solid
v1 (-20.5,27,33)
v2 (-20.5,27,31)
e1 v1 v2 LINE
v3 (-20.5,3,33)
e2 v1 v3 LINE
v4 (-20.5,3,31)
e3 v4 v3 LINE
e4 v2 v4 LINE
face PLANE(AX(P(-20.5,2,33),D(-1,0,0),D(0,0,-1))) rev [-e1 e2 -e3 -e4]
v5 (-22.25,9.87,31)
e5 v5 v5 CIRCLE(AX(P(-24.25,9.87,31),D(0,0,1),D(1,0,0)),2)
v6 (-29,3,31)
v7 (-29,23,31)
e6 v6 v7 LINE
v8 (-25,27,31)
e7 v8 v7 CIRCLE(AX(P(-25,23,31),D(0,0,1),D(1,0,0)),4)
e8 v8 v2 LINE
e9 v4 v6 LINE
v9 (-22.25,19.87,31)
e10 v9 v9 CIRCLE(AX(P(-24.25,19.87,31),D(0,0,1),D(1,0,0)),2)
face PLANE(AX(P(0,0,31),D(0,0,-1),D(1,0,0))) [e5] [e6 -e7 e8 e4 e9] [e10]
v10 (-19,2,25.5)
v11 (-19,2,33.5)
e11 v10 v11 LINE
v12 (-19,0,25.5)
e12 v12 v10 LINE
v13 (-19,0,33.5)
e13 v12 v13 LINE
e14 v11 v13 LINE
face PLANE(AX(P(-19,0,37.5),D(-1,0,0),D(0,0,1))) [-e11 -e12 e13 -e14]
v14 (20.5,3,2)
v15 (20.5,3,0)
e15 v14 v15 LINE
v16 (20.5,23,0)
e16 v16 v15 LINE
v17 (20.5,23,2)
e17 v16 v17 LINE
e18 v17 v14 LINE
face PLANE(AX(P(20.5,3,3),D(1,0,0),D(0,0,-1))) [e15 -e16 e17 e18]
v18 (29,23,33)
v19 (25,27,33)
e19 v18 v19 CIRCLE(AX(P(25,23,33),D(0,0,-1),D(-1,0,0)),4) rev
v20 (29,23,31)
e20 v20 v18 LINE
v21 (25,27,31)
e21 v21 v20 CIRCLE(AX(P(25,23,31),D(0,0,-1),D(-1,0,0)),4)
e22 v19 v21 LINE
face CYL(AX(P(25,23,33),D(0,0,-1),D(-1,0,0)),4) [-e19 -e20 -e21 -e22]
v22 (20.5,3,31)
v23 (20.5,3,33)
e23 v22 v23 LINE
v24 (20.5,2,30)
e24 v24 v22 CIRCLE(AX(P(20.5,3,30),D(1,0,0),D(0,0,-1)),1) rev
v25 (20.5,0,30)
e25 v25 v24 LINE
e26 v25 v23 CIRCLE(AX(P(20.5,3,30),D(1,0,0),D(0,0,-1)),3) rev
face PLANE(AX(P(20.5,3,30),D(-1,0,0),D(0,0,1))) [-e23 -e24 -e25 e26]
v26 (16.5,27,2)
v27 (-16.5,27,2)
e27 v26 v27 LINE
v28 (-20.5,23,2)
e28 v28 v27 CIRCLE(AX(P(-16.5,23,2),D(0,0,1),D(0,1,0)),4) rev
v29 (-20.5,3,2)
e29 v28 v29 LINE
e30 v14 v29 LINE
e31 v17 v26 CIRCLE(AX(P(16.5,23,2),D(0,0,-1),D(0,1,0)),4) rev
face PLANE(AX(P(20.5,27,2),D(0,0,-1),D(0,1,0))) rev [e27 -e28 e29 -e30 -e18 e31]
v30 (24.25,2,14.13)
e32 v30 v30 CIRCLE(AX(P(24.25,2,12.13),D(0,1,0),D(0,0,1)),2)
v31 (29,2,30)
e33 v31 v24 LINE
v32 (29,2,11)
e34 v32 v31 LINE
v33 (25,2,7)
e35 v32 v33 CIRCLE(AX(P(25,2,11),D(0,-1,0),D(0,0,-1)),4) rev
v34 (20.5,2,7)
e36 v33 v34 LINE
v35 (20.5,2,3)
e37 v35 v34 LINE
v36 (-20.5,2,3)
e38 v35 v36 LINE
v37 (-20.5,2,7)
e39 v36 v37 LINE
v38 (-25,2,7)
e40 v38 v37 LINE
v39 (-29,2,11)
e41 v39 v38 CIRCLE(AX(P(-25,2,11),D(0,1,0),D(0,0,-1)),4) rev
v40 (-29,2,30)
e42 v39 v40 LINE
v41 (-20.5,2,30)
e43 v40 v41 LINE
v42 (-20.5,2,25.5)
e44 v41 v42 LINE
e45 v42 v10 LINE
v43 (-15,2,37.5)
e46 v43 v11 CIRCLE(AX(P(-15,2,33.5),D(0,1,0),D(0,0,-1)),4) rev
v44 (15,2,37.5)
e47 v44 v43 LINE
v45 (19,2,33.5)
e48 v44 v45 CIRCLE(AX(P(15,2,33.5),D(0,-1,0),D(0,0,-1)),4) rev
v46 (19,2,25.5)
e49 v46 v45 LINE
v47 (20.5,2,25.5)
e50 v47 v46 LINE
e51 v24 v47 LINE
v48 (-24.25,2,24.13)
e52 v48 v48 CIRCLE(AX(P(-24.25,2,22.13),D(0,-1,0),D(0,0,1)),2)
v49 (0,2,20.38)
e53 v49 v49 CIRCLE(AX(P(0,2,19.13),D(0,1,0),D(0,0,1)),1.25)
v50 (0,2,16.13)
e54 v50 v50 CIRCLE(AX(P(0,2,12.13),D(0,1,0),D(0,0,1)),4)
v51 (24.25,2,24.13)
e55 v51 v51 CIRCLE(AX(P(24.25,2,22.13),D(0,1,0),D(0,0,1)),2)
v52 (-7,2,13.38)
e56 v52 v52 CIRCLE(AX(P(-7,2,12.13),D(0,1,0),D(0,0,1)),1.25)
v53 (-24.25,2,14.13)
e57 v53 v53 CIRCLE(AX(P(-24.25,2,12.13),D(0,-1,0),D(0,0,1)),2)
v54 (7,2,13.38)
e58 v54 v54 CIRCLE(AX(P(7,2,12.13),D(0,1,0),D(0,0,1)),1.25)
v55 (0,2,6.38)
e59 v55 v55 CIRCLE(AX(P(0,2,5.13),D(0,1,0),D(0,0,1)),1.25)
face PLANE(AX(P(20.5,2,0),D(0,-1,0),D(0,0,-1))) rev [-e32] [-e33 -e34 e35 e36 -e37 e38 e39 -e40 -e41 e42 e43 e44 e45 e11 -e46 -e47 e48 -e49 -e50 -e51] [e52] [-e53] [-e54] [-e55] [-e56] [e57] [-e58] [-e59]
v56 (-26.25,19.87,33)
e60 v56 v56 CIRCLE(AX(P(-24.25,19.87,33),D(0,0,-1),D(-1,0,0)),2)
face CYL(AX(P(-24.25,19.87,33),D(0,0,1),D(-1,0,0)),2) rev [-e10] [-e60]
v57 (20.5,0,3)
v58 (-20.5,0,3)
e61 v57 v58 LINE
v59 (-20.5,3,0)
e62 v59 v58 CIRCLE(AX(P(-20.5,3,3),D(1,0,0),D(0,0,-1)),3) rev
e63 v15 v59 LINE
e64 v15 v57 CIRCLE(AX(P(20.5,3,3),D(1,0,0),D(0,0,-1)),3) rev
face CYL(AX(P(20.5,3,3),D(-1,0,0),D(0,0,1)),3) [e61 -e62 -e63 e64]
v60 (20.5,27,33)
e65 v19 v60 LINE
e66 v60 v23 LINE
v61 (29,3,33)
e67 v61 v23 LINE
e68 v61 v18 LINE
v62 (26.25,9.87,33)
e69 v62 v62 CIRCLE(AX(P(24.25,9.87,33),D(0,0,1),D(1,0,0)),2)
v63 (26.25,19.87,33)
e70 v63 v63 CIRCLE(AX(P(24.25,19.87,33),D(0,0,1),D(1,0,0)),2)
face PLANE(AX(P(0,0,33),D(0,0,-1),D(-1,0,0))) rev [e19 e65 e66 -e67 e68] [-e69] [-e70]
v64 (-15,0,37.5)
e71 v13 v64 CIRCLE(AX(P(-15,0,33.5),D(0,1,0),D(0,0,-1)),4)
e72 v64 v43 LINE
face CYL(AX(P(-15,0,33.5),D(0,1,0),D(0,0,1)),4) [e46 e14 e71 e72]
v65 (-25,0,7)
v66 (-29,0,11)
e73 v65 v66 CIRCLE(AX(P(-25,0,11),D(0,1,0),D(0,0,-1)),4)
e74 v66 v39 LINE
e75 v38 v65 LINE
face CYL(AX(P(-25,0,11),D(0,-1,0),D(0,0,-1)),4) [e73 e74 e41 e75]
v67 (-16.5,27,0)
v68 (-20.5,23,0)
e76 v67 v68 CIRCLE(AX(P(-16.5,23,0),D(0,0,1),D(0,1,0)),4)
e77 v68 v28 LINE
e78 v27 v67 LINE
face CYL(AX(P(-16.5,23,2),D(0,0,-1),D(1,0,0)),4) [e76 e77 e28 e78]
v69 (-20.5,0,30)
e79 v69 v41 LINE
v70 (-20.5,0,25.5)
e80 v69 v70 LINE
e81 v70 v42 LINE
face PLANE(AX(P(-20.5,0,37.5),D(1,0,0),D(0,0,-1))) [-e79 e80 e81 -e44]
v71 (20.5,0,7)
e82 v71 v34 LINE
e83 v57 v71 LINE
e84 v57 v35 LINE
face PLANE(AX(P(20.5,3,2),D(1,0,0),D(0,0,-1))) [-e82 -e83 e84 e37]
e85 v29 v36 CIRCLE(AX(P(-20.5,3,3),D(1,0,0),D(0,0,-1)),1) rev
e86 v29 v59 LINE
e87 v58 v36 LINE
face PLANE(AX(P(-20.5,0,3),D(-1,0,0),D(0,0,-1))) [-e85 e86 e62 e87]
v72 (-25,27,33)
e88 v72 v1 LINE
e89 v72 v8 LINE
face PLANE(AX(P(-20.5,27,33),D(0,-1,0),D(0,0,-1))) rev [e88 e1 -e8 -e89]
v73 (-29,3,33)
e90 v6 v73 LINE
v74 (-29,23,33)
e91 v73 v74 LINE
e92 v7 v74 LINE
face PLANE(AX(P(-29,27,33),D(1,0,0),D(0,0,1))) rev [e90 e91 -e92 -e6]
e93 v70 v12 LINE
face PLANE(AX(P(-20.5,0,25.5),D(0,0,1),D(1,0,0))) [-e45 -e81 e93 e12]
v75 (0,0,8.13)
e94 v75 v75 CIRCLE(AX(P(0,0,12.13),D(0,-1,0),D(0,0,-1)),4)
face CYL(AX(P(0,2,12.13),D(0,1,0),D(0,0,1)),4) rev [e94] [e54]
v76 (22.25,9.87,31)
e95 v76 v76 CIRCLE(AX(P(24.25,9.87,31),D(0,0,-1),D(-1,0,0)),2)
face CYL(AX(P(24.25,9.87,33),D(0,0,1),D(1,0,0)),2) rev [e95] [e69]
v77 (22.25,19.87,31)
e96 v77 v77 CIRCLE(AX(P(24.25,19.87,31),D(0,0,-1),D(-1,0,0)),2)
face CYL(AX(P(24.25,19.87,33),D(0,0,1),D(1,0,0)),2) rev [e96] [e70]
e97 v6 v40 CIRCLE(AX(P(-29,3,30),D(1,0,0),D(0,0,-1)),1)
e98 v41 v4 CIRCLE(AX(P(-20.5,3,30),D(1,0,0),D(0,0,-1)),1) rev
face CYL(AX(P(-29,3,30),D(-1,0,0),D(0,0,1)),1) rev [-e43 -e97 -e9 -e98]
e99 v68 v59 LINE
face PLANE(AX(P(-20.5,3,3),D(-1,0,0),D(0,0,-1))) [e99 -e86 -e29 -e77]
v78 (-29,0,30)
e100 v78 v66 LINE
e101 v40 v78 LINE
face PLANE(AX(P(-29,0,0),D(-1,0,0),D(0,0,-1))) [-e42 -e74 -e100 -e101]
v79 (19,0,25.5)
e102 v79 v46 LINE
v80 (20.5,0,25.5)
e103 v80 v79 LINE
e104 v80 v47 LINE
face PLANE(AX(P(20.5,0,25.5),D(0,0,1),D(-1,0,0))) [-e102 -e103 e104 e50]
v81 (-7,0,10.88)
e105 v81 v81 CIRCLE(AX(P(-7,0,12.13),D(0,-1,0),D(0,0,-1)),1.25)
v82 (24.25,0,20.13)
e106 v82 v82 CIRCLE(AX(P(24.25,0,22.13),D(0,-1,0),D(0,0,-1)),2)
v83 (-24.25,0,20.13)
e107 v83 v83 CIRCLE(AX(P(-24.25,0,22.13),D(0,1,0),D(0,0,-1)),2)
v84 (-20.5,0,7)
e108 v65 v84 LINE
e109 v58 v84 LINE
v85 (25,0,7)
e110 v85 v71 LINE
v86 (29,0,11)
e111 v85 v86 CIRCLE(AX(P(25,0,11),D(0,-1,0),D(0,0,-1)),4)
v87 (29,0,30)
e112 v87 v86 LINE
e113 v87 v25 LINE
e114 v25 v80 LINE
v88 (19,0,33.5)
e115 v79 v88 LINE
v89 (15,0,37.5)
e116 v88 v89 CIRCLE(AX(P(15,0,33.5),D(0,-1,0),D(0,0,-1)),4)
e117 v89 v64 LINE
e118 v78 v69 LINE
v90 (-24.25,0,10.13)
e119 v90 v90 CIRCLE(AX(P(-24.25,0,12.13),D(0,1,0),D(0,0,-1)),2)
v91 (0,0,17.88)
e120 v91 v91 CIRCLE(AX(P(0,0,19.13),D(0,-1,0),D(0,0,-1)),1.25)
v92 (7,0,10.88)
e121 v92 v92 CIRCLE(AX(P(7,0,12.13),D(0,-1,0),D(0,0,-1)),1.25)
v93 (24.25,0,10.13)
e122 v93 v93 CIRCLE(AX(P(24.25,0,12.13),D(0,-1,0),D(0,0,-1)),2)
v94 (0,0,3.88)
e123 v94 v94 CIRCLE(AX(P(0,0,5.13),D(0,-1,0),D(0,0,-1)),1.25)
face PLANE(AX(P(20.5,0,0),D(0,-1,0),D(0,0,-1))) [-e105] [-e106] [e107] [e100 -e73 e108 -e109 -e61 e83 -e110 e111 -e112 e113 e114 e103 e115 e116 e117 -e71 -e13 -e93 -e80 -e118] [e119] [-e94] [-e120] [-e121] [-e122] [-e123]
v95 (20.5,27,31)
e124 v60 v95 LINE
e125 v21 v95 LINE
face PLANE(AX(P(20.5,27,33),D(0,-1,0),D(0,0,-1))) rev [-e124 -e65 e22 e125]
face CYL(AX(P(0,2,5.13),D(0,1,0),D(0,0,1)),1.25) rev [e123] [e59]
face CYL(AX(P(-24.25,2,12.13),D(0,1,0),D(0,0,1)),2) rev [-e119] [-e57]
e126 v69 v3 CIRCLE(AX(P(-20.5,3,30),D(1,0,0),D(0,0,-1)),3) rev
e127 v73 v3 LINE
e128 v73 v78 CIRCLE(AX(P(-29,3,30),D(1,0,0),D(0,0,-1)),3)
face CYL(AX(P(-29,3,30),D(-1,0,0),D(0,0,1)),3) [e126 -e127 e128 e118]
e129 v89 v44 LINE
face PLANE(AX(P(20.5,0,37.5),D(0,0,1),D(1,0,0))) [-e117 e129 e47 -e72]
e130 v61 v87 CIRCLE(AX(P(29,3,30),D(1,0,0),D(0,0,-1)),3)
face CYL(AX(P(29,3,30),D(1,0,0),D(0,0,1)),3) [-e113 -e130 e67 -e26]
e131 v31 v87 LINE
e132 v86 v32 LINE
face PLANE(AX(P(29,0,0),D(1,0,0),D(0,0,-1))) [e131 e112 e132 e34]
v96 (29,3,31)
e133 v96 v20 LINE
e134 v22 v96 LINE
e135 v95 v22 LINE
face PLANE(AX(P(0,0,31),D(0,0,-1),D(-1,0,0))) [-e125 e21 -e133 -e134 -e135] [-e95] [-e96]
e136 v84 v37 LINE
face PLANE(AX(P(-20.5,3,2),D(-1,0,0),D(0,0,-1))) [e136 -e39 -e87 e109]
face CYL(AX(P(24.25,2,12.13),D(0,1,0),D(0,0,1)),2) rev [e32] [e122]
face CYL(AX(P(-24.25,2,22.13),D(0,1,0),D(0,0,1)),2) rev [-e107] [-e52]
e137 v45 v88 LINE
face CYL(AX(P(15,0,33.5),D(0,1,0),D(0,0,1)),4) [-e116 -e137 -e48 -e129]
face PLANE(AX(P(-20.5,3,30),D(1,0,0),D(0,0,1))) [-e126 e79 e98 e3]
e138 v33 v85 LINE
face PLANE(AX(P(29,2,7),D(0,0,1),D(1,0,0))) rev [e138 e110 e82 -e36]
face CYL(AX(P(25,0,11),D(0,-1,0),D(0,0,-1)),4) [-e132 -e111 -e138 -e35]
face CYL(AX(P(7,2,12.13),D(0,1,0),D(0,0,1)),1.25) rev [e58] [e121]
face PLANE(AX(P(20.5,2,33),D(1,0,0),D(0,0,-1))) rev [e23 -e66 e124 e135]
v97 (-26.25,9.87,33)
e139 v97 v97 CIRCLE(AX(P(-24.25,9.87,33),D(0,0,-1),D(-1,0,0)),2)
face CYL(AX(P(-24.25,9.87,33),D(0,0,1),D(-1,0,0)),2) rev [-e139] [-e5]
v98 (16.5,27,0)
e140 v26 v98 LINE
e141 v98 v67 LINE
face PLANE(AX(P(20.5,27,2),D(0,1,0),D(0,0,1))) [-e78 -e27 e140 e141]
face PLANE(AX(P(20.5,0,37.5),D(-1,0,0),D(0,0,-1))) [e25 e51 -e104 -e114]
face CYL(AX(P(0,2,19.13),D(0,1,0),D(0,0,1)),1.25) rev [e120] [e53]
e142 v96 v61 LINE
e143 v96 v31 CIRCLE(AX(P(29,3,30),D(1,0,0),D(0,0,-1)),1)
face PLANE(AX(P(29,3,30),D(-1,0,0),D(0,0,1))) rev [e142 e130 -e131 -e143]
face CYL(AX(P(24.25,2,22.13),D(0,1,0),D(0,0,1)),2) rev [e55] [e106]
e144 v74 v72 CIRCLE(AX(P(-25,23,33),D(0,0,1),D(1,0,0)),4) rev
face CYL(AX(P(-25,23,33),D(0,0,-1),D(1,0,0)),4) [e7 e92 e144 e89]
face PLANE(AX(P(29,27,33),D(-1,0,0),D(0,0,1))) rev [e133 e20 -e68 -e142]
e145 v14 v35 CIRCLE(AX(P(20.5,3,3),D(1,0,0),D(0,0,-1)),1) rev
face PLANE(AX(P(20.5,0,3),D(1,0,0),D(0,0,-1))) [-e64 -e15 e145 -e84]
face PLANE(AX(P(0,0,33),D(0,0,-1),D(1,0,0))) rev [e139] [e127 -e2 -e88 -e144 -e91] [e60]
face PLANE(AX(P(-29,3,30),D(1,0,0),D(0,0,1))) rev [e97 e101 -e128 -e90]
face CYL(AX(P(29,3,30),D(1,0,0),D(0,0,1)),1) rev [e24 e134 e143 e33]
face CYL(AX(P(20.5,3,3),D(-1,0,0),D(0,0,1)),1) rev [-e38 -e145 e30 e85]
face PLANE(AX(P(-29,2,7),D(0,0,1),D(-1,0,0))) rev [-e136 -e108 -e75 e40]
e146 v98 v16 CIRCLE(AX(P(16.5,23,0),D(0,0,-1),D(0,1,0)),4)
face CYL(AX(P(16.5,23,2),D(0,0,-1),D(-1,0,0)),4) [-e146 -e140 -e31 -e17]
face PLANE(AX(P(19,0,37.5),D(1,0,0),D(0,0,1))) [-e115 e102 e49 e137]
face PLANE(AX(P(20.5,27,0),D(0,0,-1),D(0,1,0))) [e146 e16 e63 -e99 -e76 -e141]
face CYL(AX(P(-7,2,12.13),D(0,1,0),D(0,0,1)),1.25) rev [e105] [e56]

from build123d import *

# Parameters (mm, degrees)
T_LE_DE_BASE_PLI_E1_DEPTH             = 20.5
ESQUISSE8_W                           = 24
ESQUISSE8_H                           = 2
BOSS_EXTRU_1_DEPTH                    = 8.5
T_LE_PLI_E_SUR_AR_TE1_STRIP_W         = 10
T_LE_PLI_E_SUR_AR_TE1_STRIP_H         = 2
T_LE_PLI_E_SUR_AR_TE1_STRIP_CUT_DEPTH = 8.5
T_LE_PLI_E_SUR_AR_TE1_DEPTH           = 8.5
ESQUISSE12_W                          = 1.5
ESQUISSE12_H                          = 12
ENL_V_MAT_EXTRU_1_DEPTH               = 8.5
DIAM_TRE_DU_PER_AGE_4_0_4_1_D         = 4
DIAM_TRE_DU_PER_AGE_4_0_4_2_D         = 4
CONG_1_R                              = 4
DIAM_TRE_DU_PER_AGE_8_0_8_2_D         = 8
DIAM_TRE_DU_PER_AGE_2_5_2_5_3_D       = 2.5
R_P_TITION_CIRCULAIRE2_COUNT          = 4


# Sheet-metal steps are written as plain solids
with BuildPart() as part:
    # Esquisse1 → Tôle de base pliée1 (new body)
    with BuildSketch(Plane(origin=(0, 0, 0), x_dir=(0, 0, -1), z_dir=(1, 0, 0))):
        with BuildLine():
            Line((0, 27), (0, 3))
            ThreePointArc((0, 3), (-0.878679656, 0.878679656), (-3, 0))
            Line((-3, 0), (-37.5, 0))
            Line((-37.5, 0), (-37.5, 2))
            Line((-37.5, 2), (-3, 2))
            ThreePointArc((-3, 2), (-2.292893219, 2.292893219), (-2, 3))
            Line((-2, 3), (-2, 27))
            Line((-2, 27), (0, 27))
        make_face()
    extrude(amount=T_LE_DE_BASE_PLI_E1_DEPTH)

    # Esquisse8 → Boss.-Extru.1 (add)
    with BuildSketch(Plane(origin=(20.5, 0, 0), x_dir=(0, 0, -1), z_dir=(1, 0, 0))):
        with Locations((-19, 1)):
            Rectangle(ESQUISSE8_W, ESQUISSE8_H)
    extrude(amount=BOSS_EXTRU_1_DEPTH)

    # Tôle pliée sur arête1 strip (across the edge) → Tôle pliée sur arête1 strip cut (cut)
    with BuildSketch(Plane(origin=(20.5, 2, 31), x_dir=(0, 0, -1), z_dir=(1, 0, 0))):
        with Locations((-4, -1)):
            Rectangle(T_LE_PLI_E_SUR_AR_TE1_STRIP_W, T_LE_PLI_E_SUR_AR_TE1_STRIP_H)
    extrude(amount=T_LE_PLI_E_SUR_AR_TE1_STRIP_CUT_DEPTH, mode=Mode.SUBTRACT)

    # Tôle pliée sur arête1 section (across the edge) → Tôle pliée sur arête1 (add)
    with BuildSketch(Plane(origin=(20.5, 2, 31), x_dir=(0, 0, -1), z_dir=(1, 0, 0))):
        with BuildLine():
            Line((-2, 1), (-2, 25))
            Line((-2, 25), (0, 25))
            Line((0, 25), (0, 1))
            ThreePointArc((0, 1), (0.292893219, 0.292893219), (1, 0))
            Line((1, 0), (1, -2))
            ThreePointArc((1, -2), (-1.121320344, -1.121320344), (-2, 1))
        make_face()
    extrude(amount=T_LE_PLI_E_SUR_AR_TE1_DEPTH)

    # Esquisse12 → Enlèv. mat.-Extru.1 (cut)
    with BuildSketch(Plane(origin=(0, 2, 0), x_dir=(1, 0, 0), z_dir=(0, 1, 0))):
        with Locations((19.75, -31.5)):
            Rectangle(ESQUISSE12_W, ESQUISSE12_H)
    extrude(amount=-ENL_V_MAT_EXTRU_1_DEPTH, mode=Mode.SUBTRACT)

    # Diamètre du perçage Ø4.0 (4)1 (through all)
    with Locations(Plane(origin=(0, 2, 0), x_dir=(1, 0, 0), z_dir=(0, 1, 0))):
        with Locations((24.25, -12.13), (24.25, -22.13)):
            Hole(DIAM_TRE_DU_PER_AGE_4_0_4_1_D / 2)

    # Diamètre du perçage Ø4.0 (4)2 (through all)
    with Locations(Plane.XY.offset(33)):
        with Locations((24.25, 19.87), (24.25, 9.87)):
            Hole(DIAM_TRE_DU_PER_AGE_4_0_4_2_D / 2)

    # Congé1
    cong_1_edges = [part.edges().sort_by_distance(p)[0] for p in [
        (20.5, 27, 1),
        (29, 1, 7),
        (29, 27, 32),
        (19, 1, 37.5),
    ]]
    fillet(cong_1_edges, radius=CONG_1_R)

    # Symétrie1: part across plane


with BuildPart() as part_1:
    add(part.part)
    add(part.part.mirror(Plane(origin=(0, 3, 3), x_dir=(0, 0, 1), z_dir=(1, 0, 0))))

    # Diamètre du perçage Ø8.0 (8)2 (through all)
    with Locations(Plane(origin=(0, 2, 0), x_dir=(1, 0, 0), z_dir=(0, 1, 0))):
        with Locations((0, -12.13)):
            Hole(DIAM_TRE_DU_PER_AGE_8_0_8_2_D / 2)

    # Diamètre du perçage Ø2.5 (2.5)3 (through all)
    with Locations(Plane(origin=(0, 2, 0), x_dir=(1, 0, 0), z_dir=(0, 1, 0))):
        with Locations((0, -5.13)):
            diam_tre_du_per_age_2_5_2_5_3 = Hole(DIAM_TRE_DU_PER_AGE_2_5_2_5_3_D / 2)

    # Répétition circulaire2: Diamètre du perçage Ø2.5 (2.5)3 ×4 about axis
    r_p_tition_circulaire2_axis = Axis((0, 0, 12.13), (0, 1, 0))
    for i in range(1, R_P_TITION_CIRCULAIRE2_COUNT):
        add(diam_tre_du_per_age_2_5_2_5_3.rotate(r_p_tition_circulaire2_axis, i * 360 / R_P_TITION_CIRCULAIRE2_COUNT), mode=Mode.SUBTRACT)


solid = part_1.part
